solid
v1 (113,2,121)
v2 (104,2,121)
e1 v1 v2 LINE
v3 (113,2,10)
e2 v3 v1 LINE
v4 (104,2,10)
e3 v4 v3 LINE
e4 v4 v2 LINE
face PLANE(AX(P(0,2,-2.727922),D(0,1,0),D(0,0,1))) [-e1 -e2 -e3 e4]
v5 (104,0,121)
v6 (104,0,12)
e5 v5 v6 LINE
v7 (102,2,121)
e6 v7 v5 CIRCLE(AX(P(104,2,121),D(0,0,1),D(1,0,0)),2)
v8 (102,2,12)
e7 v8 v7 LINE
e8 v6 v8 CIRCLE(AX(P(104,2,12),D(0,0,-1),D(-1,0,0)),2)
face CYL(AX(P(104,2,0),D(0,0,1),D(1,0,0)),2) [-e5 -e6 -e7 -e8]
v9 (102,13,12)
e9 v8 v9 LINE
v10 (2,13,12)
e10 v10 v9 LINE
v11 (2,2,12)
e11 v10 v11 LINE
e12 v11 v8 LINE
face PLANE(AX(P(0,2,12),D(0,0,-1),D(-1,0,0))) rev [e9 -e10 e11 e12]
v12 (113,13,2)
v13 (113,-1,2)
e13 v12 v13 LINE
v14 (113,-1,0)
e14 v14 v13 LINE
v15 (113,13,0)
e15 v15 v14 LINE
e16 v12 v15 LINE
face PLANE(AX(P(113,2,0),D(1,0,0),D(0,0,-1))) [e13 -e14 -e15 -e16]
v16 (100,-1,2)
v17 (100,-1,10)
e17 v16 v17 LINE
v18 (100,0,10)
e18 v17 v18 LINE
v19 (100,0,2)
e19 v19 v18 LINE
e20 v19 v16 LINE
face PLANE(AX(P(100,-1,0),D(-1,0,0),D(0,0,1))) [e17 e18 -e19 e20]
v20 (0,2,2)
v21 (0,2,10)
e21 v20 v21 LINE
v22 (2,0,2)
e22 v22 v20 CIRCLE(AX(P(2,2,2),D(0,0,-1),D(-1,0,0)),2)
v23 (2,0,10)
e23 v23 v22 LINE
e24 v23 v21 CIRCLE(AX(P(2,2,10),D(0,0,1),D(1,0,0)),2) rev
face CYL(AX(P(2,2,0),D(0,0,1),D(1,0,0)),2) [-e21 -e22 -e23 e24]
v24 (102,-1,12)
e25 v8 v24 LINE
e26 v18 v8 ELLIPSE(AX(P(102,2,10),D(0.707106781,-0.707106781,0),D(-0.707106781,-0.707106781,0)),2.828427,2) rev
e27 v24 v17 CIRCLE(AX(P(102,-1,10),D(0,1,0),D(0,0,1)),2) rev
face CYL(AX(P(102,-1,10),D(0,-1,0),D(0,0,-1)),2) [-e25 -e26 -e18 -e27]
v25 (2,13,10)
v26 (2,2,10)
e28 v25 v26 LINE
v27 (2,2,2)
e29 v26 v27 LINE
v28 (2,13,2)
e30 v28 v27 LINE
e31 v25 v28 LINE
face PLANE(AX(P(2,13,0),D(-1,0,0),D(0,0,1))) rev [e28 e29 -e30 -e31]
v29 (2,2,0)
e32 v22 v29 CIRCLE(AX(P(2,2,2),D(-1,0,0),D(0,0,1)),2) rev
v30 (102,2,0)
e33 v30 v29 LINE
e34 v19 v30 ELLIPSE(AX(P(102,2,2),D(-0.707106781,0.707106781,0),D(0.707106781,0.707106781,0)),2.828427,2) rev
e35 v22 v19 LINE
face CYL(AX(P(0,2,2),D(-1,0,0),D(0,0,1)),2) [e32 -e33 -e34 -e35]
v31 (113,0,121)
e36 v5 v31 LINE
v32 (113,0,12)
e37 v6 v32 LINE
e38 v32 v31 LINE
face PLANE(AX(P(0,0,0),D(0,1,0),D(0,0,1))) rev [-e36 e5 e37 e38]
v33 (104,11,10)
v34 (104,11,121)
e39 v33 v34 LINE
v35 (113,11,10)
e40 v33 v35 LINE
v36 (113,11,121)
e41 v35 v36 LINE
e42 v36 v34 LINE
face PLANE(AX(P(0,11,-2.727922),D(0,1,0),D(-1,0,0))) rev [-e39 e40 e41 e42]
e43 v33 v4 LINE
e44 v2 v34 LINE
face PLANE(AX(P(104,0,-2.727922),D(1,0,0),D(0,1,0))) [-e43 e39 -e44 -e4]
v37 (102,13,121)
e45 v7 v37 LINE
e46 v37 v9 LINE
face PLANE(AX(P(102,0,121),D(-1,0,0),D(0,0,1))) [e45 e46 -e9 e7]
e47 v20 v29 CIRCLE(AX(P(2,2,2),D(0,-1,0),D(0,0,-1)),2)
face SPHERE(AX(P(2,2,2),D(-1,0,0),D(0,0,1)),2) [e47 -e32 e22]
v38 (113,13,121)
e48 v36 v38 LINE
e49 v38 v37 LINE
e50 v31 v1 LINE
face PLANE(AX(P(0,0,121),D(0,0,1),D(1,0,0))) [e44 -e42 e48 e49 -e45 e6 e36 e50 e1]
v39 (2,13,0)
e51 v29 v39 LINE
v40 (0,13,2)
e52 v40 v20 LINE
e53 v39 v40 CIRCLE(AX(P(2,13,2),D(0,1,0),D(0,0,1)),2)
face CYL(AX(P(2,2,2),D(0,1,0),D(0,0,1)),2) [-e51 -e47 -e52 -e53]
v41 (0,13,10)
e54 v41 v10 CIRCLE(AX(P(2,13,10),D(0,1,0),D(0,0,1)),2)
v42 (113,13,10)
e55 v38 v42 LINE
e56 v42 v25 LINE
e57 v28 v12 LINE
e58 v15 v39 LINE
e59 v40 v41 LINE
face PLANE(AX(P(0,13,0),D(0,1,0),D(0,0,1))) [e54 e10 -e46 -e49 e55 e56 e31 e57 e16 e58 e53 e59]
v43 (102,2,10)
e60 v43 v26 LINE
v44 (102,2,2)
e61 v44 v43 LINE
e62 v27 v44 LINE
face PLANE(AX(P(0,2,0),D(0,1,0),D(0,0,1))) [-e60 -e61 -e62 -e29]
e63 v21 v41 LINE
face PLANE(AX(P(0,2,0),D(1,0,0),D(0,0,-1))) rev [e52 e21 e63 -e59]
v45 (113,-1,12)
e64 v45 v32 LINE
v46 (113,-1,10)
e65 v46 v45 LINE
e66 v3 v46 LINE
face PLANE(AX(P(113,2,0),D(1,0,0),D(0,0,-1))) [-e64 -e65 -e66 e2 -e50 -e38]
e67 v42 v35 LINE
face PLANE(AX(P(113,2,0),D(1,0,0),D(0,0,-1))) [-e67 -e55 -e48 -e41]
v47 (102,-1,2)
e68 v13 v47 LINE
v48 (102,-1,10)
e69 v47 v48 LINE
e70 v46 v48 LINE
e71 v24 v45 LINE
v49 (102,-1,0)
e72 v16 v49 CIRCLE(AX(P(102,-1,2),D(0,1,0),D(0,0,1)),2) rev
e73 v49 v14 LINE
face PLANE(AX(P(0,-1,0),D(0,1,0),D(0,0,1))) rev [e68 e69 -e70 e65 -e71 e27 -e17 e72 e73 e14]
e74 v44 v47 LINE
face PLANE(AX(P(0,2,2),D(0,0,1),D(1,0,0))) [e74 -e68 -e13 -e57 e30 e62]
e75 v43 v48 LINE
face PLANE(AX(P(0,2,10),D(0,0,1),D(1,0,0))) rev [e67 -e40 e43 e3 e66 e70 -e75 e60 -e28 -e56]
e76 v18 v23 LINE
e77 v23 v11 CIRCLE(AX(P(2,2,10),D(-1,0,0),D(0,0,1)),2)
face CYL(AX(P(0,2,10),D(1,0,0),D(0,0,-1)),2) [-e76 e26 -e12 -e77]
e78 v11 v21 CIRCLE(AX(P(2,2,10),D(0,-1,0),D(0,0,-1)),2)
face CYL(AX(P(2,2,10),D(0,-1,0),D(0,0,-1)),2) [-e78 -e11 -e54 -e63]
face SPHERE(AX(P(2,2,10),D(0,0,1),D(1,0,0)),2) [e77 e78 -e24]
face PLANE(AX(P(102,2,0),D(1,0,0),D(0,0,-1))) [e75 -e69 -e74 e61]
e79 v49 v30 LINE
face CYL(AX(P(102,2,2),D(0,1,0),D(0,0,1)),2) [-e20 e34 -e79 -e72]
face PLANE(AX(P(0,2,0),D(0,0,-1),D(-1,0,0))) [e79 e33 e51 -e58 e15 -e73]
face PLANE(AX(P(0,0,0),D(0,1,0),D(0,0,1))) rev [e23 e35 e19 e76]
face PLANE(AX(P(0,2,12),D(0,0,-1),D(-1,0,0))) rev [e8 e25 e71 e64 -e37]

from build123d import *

# Parameters (mm, degrees)
BOSS_EXTRUDE1_DEPTH = 2
BOSS_EXTRUDE2_DEPTH = 11
SKETCH3_W           = 9
SKETCH3_H           = 9
CUT_EXTRUDE1_DEPTH  = 2
BOSS_EXTRUDE3_DEPTH = 109
BOSS_EXTRUDE4_DEPTH = 1
FILLET1_R           = 2


with BuildPart() as part:
    # Sketch1 → Boss-Extrude1 (new body)
    with BuildSketch(Plane(origin=(0, 0, 0), x_dir=(1, 0, 0), z_dir=(0, 1, 0))):
        Polygon((0, 0), (0, -12), (113, -12), (113, -10), (102, -10), (102, -2), (113, -2), (113, 0), align=None)
    extrude(amount=BOSS_EXTRUDE1_DEPTH)

    # Sketch2 → Boss-Extrude2 (add)
    with BuildSketch(Plane(origin=(0, 2, 0), x_dir=(1, 0, 0), z_dir=(0, 1, 0))):
        Polygon((2, -10), (2, -2), (102, -2), (113, -2), (113, 0), (0, 0), (0, -12), (113, -12), (113, -10), (102, -10), align=None)
    extrude(amount=BOSS_EXTRUDE2_DEPTH)

    # Sketch3 → Cut-Extrude1 (cut)
    with BuildSketch(Plane.XY.offset(12)):
        with Locations((108.5, 6.5)):
            Rectangle(SKETCH3_W, SKETCH3_H)
    extrude(amount=-CUT_EXTRUDE1_DEPTH, mode=Mode.SUBTRACT)

    # Sketch3<3> → Boss-Extrude3 (add)
    with BuildSketch(Plane.XY.offset(12)):
        Polygon((113, 0), (113, 2), (104, 2), (104, 11), (113, 11), (113, 13), (102, 13), (102, 0), align=None)
    extrude(amount=BOSS_EXTRUDE3_DEPTH)

    # Sketch1<3> → Boss-Extrude4 (add)
    with BuildSketch(Plane(origin=(0, 0, 0), x_dir=(1, 0, 0), z_dir=(0, 1, 0))):
        Polygon((113, 0), (100, 0), (100, -12), (113, -12), (113, -10), (102, -10), (102, -2), (113, -2), align=None)
    extrude(amount=-BOSS_EXTRUDE4_DEPTH)

    # Fillet1
    fillet1_edges = [part.edges().sort_by_distance(p)[0] for p in [
        (100, -0.5, 0),
        (50, 0, 12),
        (0, 0, 6),
        (50, 0, 0),
        (0, 6.5, 12),
        (0, 6.5, 0),
        (102, 0, 66.5),
        (100, -0.5, 12),
    ]]
    fillet(fillet1_edges, radius=FILLET1_R - 0.0001)  # a hair under: the kernel refuses the full size


solid = part.part
